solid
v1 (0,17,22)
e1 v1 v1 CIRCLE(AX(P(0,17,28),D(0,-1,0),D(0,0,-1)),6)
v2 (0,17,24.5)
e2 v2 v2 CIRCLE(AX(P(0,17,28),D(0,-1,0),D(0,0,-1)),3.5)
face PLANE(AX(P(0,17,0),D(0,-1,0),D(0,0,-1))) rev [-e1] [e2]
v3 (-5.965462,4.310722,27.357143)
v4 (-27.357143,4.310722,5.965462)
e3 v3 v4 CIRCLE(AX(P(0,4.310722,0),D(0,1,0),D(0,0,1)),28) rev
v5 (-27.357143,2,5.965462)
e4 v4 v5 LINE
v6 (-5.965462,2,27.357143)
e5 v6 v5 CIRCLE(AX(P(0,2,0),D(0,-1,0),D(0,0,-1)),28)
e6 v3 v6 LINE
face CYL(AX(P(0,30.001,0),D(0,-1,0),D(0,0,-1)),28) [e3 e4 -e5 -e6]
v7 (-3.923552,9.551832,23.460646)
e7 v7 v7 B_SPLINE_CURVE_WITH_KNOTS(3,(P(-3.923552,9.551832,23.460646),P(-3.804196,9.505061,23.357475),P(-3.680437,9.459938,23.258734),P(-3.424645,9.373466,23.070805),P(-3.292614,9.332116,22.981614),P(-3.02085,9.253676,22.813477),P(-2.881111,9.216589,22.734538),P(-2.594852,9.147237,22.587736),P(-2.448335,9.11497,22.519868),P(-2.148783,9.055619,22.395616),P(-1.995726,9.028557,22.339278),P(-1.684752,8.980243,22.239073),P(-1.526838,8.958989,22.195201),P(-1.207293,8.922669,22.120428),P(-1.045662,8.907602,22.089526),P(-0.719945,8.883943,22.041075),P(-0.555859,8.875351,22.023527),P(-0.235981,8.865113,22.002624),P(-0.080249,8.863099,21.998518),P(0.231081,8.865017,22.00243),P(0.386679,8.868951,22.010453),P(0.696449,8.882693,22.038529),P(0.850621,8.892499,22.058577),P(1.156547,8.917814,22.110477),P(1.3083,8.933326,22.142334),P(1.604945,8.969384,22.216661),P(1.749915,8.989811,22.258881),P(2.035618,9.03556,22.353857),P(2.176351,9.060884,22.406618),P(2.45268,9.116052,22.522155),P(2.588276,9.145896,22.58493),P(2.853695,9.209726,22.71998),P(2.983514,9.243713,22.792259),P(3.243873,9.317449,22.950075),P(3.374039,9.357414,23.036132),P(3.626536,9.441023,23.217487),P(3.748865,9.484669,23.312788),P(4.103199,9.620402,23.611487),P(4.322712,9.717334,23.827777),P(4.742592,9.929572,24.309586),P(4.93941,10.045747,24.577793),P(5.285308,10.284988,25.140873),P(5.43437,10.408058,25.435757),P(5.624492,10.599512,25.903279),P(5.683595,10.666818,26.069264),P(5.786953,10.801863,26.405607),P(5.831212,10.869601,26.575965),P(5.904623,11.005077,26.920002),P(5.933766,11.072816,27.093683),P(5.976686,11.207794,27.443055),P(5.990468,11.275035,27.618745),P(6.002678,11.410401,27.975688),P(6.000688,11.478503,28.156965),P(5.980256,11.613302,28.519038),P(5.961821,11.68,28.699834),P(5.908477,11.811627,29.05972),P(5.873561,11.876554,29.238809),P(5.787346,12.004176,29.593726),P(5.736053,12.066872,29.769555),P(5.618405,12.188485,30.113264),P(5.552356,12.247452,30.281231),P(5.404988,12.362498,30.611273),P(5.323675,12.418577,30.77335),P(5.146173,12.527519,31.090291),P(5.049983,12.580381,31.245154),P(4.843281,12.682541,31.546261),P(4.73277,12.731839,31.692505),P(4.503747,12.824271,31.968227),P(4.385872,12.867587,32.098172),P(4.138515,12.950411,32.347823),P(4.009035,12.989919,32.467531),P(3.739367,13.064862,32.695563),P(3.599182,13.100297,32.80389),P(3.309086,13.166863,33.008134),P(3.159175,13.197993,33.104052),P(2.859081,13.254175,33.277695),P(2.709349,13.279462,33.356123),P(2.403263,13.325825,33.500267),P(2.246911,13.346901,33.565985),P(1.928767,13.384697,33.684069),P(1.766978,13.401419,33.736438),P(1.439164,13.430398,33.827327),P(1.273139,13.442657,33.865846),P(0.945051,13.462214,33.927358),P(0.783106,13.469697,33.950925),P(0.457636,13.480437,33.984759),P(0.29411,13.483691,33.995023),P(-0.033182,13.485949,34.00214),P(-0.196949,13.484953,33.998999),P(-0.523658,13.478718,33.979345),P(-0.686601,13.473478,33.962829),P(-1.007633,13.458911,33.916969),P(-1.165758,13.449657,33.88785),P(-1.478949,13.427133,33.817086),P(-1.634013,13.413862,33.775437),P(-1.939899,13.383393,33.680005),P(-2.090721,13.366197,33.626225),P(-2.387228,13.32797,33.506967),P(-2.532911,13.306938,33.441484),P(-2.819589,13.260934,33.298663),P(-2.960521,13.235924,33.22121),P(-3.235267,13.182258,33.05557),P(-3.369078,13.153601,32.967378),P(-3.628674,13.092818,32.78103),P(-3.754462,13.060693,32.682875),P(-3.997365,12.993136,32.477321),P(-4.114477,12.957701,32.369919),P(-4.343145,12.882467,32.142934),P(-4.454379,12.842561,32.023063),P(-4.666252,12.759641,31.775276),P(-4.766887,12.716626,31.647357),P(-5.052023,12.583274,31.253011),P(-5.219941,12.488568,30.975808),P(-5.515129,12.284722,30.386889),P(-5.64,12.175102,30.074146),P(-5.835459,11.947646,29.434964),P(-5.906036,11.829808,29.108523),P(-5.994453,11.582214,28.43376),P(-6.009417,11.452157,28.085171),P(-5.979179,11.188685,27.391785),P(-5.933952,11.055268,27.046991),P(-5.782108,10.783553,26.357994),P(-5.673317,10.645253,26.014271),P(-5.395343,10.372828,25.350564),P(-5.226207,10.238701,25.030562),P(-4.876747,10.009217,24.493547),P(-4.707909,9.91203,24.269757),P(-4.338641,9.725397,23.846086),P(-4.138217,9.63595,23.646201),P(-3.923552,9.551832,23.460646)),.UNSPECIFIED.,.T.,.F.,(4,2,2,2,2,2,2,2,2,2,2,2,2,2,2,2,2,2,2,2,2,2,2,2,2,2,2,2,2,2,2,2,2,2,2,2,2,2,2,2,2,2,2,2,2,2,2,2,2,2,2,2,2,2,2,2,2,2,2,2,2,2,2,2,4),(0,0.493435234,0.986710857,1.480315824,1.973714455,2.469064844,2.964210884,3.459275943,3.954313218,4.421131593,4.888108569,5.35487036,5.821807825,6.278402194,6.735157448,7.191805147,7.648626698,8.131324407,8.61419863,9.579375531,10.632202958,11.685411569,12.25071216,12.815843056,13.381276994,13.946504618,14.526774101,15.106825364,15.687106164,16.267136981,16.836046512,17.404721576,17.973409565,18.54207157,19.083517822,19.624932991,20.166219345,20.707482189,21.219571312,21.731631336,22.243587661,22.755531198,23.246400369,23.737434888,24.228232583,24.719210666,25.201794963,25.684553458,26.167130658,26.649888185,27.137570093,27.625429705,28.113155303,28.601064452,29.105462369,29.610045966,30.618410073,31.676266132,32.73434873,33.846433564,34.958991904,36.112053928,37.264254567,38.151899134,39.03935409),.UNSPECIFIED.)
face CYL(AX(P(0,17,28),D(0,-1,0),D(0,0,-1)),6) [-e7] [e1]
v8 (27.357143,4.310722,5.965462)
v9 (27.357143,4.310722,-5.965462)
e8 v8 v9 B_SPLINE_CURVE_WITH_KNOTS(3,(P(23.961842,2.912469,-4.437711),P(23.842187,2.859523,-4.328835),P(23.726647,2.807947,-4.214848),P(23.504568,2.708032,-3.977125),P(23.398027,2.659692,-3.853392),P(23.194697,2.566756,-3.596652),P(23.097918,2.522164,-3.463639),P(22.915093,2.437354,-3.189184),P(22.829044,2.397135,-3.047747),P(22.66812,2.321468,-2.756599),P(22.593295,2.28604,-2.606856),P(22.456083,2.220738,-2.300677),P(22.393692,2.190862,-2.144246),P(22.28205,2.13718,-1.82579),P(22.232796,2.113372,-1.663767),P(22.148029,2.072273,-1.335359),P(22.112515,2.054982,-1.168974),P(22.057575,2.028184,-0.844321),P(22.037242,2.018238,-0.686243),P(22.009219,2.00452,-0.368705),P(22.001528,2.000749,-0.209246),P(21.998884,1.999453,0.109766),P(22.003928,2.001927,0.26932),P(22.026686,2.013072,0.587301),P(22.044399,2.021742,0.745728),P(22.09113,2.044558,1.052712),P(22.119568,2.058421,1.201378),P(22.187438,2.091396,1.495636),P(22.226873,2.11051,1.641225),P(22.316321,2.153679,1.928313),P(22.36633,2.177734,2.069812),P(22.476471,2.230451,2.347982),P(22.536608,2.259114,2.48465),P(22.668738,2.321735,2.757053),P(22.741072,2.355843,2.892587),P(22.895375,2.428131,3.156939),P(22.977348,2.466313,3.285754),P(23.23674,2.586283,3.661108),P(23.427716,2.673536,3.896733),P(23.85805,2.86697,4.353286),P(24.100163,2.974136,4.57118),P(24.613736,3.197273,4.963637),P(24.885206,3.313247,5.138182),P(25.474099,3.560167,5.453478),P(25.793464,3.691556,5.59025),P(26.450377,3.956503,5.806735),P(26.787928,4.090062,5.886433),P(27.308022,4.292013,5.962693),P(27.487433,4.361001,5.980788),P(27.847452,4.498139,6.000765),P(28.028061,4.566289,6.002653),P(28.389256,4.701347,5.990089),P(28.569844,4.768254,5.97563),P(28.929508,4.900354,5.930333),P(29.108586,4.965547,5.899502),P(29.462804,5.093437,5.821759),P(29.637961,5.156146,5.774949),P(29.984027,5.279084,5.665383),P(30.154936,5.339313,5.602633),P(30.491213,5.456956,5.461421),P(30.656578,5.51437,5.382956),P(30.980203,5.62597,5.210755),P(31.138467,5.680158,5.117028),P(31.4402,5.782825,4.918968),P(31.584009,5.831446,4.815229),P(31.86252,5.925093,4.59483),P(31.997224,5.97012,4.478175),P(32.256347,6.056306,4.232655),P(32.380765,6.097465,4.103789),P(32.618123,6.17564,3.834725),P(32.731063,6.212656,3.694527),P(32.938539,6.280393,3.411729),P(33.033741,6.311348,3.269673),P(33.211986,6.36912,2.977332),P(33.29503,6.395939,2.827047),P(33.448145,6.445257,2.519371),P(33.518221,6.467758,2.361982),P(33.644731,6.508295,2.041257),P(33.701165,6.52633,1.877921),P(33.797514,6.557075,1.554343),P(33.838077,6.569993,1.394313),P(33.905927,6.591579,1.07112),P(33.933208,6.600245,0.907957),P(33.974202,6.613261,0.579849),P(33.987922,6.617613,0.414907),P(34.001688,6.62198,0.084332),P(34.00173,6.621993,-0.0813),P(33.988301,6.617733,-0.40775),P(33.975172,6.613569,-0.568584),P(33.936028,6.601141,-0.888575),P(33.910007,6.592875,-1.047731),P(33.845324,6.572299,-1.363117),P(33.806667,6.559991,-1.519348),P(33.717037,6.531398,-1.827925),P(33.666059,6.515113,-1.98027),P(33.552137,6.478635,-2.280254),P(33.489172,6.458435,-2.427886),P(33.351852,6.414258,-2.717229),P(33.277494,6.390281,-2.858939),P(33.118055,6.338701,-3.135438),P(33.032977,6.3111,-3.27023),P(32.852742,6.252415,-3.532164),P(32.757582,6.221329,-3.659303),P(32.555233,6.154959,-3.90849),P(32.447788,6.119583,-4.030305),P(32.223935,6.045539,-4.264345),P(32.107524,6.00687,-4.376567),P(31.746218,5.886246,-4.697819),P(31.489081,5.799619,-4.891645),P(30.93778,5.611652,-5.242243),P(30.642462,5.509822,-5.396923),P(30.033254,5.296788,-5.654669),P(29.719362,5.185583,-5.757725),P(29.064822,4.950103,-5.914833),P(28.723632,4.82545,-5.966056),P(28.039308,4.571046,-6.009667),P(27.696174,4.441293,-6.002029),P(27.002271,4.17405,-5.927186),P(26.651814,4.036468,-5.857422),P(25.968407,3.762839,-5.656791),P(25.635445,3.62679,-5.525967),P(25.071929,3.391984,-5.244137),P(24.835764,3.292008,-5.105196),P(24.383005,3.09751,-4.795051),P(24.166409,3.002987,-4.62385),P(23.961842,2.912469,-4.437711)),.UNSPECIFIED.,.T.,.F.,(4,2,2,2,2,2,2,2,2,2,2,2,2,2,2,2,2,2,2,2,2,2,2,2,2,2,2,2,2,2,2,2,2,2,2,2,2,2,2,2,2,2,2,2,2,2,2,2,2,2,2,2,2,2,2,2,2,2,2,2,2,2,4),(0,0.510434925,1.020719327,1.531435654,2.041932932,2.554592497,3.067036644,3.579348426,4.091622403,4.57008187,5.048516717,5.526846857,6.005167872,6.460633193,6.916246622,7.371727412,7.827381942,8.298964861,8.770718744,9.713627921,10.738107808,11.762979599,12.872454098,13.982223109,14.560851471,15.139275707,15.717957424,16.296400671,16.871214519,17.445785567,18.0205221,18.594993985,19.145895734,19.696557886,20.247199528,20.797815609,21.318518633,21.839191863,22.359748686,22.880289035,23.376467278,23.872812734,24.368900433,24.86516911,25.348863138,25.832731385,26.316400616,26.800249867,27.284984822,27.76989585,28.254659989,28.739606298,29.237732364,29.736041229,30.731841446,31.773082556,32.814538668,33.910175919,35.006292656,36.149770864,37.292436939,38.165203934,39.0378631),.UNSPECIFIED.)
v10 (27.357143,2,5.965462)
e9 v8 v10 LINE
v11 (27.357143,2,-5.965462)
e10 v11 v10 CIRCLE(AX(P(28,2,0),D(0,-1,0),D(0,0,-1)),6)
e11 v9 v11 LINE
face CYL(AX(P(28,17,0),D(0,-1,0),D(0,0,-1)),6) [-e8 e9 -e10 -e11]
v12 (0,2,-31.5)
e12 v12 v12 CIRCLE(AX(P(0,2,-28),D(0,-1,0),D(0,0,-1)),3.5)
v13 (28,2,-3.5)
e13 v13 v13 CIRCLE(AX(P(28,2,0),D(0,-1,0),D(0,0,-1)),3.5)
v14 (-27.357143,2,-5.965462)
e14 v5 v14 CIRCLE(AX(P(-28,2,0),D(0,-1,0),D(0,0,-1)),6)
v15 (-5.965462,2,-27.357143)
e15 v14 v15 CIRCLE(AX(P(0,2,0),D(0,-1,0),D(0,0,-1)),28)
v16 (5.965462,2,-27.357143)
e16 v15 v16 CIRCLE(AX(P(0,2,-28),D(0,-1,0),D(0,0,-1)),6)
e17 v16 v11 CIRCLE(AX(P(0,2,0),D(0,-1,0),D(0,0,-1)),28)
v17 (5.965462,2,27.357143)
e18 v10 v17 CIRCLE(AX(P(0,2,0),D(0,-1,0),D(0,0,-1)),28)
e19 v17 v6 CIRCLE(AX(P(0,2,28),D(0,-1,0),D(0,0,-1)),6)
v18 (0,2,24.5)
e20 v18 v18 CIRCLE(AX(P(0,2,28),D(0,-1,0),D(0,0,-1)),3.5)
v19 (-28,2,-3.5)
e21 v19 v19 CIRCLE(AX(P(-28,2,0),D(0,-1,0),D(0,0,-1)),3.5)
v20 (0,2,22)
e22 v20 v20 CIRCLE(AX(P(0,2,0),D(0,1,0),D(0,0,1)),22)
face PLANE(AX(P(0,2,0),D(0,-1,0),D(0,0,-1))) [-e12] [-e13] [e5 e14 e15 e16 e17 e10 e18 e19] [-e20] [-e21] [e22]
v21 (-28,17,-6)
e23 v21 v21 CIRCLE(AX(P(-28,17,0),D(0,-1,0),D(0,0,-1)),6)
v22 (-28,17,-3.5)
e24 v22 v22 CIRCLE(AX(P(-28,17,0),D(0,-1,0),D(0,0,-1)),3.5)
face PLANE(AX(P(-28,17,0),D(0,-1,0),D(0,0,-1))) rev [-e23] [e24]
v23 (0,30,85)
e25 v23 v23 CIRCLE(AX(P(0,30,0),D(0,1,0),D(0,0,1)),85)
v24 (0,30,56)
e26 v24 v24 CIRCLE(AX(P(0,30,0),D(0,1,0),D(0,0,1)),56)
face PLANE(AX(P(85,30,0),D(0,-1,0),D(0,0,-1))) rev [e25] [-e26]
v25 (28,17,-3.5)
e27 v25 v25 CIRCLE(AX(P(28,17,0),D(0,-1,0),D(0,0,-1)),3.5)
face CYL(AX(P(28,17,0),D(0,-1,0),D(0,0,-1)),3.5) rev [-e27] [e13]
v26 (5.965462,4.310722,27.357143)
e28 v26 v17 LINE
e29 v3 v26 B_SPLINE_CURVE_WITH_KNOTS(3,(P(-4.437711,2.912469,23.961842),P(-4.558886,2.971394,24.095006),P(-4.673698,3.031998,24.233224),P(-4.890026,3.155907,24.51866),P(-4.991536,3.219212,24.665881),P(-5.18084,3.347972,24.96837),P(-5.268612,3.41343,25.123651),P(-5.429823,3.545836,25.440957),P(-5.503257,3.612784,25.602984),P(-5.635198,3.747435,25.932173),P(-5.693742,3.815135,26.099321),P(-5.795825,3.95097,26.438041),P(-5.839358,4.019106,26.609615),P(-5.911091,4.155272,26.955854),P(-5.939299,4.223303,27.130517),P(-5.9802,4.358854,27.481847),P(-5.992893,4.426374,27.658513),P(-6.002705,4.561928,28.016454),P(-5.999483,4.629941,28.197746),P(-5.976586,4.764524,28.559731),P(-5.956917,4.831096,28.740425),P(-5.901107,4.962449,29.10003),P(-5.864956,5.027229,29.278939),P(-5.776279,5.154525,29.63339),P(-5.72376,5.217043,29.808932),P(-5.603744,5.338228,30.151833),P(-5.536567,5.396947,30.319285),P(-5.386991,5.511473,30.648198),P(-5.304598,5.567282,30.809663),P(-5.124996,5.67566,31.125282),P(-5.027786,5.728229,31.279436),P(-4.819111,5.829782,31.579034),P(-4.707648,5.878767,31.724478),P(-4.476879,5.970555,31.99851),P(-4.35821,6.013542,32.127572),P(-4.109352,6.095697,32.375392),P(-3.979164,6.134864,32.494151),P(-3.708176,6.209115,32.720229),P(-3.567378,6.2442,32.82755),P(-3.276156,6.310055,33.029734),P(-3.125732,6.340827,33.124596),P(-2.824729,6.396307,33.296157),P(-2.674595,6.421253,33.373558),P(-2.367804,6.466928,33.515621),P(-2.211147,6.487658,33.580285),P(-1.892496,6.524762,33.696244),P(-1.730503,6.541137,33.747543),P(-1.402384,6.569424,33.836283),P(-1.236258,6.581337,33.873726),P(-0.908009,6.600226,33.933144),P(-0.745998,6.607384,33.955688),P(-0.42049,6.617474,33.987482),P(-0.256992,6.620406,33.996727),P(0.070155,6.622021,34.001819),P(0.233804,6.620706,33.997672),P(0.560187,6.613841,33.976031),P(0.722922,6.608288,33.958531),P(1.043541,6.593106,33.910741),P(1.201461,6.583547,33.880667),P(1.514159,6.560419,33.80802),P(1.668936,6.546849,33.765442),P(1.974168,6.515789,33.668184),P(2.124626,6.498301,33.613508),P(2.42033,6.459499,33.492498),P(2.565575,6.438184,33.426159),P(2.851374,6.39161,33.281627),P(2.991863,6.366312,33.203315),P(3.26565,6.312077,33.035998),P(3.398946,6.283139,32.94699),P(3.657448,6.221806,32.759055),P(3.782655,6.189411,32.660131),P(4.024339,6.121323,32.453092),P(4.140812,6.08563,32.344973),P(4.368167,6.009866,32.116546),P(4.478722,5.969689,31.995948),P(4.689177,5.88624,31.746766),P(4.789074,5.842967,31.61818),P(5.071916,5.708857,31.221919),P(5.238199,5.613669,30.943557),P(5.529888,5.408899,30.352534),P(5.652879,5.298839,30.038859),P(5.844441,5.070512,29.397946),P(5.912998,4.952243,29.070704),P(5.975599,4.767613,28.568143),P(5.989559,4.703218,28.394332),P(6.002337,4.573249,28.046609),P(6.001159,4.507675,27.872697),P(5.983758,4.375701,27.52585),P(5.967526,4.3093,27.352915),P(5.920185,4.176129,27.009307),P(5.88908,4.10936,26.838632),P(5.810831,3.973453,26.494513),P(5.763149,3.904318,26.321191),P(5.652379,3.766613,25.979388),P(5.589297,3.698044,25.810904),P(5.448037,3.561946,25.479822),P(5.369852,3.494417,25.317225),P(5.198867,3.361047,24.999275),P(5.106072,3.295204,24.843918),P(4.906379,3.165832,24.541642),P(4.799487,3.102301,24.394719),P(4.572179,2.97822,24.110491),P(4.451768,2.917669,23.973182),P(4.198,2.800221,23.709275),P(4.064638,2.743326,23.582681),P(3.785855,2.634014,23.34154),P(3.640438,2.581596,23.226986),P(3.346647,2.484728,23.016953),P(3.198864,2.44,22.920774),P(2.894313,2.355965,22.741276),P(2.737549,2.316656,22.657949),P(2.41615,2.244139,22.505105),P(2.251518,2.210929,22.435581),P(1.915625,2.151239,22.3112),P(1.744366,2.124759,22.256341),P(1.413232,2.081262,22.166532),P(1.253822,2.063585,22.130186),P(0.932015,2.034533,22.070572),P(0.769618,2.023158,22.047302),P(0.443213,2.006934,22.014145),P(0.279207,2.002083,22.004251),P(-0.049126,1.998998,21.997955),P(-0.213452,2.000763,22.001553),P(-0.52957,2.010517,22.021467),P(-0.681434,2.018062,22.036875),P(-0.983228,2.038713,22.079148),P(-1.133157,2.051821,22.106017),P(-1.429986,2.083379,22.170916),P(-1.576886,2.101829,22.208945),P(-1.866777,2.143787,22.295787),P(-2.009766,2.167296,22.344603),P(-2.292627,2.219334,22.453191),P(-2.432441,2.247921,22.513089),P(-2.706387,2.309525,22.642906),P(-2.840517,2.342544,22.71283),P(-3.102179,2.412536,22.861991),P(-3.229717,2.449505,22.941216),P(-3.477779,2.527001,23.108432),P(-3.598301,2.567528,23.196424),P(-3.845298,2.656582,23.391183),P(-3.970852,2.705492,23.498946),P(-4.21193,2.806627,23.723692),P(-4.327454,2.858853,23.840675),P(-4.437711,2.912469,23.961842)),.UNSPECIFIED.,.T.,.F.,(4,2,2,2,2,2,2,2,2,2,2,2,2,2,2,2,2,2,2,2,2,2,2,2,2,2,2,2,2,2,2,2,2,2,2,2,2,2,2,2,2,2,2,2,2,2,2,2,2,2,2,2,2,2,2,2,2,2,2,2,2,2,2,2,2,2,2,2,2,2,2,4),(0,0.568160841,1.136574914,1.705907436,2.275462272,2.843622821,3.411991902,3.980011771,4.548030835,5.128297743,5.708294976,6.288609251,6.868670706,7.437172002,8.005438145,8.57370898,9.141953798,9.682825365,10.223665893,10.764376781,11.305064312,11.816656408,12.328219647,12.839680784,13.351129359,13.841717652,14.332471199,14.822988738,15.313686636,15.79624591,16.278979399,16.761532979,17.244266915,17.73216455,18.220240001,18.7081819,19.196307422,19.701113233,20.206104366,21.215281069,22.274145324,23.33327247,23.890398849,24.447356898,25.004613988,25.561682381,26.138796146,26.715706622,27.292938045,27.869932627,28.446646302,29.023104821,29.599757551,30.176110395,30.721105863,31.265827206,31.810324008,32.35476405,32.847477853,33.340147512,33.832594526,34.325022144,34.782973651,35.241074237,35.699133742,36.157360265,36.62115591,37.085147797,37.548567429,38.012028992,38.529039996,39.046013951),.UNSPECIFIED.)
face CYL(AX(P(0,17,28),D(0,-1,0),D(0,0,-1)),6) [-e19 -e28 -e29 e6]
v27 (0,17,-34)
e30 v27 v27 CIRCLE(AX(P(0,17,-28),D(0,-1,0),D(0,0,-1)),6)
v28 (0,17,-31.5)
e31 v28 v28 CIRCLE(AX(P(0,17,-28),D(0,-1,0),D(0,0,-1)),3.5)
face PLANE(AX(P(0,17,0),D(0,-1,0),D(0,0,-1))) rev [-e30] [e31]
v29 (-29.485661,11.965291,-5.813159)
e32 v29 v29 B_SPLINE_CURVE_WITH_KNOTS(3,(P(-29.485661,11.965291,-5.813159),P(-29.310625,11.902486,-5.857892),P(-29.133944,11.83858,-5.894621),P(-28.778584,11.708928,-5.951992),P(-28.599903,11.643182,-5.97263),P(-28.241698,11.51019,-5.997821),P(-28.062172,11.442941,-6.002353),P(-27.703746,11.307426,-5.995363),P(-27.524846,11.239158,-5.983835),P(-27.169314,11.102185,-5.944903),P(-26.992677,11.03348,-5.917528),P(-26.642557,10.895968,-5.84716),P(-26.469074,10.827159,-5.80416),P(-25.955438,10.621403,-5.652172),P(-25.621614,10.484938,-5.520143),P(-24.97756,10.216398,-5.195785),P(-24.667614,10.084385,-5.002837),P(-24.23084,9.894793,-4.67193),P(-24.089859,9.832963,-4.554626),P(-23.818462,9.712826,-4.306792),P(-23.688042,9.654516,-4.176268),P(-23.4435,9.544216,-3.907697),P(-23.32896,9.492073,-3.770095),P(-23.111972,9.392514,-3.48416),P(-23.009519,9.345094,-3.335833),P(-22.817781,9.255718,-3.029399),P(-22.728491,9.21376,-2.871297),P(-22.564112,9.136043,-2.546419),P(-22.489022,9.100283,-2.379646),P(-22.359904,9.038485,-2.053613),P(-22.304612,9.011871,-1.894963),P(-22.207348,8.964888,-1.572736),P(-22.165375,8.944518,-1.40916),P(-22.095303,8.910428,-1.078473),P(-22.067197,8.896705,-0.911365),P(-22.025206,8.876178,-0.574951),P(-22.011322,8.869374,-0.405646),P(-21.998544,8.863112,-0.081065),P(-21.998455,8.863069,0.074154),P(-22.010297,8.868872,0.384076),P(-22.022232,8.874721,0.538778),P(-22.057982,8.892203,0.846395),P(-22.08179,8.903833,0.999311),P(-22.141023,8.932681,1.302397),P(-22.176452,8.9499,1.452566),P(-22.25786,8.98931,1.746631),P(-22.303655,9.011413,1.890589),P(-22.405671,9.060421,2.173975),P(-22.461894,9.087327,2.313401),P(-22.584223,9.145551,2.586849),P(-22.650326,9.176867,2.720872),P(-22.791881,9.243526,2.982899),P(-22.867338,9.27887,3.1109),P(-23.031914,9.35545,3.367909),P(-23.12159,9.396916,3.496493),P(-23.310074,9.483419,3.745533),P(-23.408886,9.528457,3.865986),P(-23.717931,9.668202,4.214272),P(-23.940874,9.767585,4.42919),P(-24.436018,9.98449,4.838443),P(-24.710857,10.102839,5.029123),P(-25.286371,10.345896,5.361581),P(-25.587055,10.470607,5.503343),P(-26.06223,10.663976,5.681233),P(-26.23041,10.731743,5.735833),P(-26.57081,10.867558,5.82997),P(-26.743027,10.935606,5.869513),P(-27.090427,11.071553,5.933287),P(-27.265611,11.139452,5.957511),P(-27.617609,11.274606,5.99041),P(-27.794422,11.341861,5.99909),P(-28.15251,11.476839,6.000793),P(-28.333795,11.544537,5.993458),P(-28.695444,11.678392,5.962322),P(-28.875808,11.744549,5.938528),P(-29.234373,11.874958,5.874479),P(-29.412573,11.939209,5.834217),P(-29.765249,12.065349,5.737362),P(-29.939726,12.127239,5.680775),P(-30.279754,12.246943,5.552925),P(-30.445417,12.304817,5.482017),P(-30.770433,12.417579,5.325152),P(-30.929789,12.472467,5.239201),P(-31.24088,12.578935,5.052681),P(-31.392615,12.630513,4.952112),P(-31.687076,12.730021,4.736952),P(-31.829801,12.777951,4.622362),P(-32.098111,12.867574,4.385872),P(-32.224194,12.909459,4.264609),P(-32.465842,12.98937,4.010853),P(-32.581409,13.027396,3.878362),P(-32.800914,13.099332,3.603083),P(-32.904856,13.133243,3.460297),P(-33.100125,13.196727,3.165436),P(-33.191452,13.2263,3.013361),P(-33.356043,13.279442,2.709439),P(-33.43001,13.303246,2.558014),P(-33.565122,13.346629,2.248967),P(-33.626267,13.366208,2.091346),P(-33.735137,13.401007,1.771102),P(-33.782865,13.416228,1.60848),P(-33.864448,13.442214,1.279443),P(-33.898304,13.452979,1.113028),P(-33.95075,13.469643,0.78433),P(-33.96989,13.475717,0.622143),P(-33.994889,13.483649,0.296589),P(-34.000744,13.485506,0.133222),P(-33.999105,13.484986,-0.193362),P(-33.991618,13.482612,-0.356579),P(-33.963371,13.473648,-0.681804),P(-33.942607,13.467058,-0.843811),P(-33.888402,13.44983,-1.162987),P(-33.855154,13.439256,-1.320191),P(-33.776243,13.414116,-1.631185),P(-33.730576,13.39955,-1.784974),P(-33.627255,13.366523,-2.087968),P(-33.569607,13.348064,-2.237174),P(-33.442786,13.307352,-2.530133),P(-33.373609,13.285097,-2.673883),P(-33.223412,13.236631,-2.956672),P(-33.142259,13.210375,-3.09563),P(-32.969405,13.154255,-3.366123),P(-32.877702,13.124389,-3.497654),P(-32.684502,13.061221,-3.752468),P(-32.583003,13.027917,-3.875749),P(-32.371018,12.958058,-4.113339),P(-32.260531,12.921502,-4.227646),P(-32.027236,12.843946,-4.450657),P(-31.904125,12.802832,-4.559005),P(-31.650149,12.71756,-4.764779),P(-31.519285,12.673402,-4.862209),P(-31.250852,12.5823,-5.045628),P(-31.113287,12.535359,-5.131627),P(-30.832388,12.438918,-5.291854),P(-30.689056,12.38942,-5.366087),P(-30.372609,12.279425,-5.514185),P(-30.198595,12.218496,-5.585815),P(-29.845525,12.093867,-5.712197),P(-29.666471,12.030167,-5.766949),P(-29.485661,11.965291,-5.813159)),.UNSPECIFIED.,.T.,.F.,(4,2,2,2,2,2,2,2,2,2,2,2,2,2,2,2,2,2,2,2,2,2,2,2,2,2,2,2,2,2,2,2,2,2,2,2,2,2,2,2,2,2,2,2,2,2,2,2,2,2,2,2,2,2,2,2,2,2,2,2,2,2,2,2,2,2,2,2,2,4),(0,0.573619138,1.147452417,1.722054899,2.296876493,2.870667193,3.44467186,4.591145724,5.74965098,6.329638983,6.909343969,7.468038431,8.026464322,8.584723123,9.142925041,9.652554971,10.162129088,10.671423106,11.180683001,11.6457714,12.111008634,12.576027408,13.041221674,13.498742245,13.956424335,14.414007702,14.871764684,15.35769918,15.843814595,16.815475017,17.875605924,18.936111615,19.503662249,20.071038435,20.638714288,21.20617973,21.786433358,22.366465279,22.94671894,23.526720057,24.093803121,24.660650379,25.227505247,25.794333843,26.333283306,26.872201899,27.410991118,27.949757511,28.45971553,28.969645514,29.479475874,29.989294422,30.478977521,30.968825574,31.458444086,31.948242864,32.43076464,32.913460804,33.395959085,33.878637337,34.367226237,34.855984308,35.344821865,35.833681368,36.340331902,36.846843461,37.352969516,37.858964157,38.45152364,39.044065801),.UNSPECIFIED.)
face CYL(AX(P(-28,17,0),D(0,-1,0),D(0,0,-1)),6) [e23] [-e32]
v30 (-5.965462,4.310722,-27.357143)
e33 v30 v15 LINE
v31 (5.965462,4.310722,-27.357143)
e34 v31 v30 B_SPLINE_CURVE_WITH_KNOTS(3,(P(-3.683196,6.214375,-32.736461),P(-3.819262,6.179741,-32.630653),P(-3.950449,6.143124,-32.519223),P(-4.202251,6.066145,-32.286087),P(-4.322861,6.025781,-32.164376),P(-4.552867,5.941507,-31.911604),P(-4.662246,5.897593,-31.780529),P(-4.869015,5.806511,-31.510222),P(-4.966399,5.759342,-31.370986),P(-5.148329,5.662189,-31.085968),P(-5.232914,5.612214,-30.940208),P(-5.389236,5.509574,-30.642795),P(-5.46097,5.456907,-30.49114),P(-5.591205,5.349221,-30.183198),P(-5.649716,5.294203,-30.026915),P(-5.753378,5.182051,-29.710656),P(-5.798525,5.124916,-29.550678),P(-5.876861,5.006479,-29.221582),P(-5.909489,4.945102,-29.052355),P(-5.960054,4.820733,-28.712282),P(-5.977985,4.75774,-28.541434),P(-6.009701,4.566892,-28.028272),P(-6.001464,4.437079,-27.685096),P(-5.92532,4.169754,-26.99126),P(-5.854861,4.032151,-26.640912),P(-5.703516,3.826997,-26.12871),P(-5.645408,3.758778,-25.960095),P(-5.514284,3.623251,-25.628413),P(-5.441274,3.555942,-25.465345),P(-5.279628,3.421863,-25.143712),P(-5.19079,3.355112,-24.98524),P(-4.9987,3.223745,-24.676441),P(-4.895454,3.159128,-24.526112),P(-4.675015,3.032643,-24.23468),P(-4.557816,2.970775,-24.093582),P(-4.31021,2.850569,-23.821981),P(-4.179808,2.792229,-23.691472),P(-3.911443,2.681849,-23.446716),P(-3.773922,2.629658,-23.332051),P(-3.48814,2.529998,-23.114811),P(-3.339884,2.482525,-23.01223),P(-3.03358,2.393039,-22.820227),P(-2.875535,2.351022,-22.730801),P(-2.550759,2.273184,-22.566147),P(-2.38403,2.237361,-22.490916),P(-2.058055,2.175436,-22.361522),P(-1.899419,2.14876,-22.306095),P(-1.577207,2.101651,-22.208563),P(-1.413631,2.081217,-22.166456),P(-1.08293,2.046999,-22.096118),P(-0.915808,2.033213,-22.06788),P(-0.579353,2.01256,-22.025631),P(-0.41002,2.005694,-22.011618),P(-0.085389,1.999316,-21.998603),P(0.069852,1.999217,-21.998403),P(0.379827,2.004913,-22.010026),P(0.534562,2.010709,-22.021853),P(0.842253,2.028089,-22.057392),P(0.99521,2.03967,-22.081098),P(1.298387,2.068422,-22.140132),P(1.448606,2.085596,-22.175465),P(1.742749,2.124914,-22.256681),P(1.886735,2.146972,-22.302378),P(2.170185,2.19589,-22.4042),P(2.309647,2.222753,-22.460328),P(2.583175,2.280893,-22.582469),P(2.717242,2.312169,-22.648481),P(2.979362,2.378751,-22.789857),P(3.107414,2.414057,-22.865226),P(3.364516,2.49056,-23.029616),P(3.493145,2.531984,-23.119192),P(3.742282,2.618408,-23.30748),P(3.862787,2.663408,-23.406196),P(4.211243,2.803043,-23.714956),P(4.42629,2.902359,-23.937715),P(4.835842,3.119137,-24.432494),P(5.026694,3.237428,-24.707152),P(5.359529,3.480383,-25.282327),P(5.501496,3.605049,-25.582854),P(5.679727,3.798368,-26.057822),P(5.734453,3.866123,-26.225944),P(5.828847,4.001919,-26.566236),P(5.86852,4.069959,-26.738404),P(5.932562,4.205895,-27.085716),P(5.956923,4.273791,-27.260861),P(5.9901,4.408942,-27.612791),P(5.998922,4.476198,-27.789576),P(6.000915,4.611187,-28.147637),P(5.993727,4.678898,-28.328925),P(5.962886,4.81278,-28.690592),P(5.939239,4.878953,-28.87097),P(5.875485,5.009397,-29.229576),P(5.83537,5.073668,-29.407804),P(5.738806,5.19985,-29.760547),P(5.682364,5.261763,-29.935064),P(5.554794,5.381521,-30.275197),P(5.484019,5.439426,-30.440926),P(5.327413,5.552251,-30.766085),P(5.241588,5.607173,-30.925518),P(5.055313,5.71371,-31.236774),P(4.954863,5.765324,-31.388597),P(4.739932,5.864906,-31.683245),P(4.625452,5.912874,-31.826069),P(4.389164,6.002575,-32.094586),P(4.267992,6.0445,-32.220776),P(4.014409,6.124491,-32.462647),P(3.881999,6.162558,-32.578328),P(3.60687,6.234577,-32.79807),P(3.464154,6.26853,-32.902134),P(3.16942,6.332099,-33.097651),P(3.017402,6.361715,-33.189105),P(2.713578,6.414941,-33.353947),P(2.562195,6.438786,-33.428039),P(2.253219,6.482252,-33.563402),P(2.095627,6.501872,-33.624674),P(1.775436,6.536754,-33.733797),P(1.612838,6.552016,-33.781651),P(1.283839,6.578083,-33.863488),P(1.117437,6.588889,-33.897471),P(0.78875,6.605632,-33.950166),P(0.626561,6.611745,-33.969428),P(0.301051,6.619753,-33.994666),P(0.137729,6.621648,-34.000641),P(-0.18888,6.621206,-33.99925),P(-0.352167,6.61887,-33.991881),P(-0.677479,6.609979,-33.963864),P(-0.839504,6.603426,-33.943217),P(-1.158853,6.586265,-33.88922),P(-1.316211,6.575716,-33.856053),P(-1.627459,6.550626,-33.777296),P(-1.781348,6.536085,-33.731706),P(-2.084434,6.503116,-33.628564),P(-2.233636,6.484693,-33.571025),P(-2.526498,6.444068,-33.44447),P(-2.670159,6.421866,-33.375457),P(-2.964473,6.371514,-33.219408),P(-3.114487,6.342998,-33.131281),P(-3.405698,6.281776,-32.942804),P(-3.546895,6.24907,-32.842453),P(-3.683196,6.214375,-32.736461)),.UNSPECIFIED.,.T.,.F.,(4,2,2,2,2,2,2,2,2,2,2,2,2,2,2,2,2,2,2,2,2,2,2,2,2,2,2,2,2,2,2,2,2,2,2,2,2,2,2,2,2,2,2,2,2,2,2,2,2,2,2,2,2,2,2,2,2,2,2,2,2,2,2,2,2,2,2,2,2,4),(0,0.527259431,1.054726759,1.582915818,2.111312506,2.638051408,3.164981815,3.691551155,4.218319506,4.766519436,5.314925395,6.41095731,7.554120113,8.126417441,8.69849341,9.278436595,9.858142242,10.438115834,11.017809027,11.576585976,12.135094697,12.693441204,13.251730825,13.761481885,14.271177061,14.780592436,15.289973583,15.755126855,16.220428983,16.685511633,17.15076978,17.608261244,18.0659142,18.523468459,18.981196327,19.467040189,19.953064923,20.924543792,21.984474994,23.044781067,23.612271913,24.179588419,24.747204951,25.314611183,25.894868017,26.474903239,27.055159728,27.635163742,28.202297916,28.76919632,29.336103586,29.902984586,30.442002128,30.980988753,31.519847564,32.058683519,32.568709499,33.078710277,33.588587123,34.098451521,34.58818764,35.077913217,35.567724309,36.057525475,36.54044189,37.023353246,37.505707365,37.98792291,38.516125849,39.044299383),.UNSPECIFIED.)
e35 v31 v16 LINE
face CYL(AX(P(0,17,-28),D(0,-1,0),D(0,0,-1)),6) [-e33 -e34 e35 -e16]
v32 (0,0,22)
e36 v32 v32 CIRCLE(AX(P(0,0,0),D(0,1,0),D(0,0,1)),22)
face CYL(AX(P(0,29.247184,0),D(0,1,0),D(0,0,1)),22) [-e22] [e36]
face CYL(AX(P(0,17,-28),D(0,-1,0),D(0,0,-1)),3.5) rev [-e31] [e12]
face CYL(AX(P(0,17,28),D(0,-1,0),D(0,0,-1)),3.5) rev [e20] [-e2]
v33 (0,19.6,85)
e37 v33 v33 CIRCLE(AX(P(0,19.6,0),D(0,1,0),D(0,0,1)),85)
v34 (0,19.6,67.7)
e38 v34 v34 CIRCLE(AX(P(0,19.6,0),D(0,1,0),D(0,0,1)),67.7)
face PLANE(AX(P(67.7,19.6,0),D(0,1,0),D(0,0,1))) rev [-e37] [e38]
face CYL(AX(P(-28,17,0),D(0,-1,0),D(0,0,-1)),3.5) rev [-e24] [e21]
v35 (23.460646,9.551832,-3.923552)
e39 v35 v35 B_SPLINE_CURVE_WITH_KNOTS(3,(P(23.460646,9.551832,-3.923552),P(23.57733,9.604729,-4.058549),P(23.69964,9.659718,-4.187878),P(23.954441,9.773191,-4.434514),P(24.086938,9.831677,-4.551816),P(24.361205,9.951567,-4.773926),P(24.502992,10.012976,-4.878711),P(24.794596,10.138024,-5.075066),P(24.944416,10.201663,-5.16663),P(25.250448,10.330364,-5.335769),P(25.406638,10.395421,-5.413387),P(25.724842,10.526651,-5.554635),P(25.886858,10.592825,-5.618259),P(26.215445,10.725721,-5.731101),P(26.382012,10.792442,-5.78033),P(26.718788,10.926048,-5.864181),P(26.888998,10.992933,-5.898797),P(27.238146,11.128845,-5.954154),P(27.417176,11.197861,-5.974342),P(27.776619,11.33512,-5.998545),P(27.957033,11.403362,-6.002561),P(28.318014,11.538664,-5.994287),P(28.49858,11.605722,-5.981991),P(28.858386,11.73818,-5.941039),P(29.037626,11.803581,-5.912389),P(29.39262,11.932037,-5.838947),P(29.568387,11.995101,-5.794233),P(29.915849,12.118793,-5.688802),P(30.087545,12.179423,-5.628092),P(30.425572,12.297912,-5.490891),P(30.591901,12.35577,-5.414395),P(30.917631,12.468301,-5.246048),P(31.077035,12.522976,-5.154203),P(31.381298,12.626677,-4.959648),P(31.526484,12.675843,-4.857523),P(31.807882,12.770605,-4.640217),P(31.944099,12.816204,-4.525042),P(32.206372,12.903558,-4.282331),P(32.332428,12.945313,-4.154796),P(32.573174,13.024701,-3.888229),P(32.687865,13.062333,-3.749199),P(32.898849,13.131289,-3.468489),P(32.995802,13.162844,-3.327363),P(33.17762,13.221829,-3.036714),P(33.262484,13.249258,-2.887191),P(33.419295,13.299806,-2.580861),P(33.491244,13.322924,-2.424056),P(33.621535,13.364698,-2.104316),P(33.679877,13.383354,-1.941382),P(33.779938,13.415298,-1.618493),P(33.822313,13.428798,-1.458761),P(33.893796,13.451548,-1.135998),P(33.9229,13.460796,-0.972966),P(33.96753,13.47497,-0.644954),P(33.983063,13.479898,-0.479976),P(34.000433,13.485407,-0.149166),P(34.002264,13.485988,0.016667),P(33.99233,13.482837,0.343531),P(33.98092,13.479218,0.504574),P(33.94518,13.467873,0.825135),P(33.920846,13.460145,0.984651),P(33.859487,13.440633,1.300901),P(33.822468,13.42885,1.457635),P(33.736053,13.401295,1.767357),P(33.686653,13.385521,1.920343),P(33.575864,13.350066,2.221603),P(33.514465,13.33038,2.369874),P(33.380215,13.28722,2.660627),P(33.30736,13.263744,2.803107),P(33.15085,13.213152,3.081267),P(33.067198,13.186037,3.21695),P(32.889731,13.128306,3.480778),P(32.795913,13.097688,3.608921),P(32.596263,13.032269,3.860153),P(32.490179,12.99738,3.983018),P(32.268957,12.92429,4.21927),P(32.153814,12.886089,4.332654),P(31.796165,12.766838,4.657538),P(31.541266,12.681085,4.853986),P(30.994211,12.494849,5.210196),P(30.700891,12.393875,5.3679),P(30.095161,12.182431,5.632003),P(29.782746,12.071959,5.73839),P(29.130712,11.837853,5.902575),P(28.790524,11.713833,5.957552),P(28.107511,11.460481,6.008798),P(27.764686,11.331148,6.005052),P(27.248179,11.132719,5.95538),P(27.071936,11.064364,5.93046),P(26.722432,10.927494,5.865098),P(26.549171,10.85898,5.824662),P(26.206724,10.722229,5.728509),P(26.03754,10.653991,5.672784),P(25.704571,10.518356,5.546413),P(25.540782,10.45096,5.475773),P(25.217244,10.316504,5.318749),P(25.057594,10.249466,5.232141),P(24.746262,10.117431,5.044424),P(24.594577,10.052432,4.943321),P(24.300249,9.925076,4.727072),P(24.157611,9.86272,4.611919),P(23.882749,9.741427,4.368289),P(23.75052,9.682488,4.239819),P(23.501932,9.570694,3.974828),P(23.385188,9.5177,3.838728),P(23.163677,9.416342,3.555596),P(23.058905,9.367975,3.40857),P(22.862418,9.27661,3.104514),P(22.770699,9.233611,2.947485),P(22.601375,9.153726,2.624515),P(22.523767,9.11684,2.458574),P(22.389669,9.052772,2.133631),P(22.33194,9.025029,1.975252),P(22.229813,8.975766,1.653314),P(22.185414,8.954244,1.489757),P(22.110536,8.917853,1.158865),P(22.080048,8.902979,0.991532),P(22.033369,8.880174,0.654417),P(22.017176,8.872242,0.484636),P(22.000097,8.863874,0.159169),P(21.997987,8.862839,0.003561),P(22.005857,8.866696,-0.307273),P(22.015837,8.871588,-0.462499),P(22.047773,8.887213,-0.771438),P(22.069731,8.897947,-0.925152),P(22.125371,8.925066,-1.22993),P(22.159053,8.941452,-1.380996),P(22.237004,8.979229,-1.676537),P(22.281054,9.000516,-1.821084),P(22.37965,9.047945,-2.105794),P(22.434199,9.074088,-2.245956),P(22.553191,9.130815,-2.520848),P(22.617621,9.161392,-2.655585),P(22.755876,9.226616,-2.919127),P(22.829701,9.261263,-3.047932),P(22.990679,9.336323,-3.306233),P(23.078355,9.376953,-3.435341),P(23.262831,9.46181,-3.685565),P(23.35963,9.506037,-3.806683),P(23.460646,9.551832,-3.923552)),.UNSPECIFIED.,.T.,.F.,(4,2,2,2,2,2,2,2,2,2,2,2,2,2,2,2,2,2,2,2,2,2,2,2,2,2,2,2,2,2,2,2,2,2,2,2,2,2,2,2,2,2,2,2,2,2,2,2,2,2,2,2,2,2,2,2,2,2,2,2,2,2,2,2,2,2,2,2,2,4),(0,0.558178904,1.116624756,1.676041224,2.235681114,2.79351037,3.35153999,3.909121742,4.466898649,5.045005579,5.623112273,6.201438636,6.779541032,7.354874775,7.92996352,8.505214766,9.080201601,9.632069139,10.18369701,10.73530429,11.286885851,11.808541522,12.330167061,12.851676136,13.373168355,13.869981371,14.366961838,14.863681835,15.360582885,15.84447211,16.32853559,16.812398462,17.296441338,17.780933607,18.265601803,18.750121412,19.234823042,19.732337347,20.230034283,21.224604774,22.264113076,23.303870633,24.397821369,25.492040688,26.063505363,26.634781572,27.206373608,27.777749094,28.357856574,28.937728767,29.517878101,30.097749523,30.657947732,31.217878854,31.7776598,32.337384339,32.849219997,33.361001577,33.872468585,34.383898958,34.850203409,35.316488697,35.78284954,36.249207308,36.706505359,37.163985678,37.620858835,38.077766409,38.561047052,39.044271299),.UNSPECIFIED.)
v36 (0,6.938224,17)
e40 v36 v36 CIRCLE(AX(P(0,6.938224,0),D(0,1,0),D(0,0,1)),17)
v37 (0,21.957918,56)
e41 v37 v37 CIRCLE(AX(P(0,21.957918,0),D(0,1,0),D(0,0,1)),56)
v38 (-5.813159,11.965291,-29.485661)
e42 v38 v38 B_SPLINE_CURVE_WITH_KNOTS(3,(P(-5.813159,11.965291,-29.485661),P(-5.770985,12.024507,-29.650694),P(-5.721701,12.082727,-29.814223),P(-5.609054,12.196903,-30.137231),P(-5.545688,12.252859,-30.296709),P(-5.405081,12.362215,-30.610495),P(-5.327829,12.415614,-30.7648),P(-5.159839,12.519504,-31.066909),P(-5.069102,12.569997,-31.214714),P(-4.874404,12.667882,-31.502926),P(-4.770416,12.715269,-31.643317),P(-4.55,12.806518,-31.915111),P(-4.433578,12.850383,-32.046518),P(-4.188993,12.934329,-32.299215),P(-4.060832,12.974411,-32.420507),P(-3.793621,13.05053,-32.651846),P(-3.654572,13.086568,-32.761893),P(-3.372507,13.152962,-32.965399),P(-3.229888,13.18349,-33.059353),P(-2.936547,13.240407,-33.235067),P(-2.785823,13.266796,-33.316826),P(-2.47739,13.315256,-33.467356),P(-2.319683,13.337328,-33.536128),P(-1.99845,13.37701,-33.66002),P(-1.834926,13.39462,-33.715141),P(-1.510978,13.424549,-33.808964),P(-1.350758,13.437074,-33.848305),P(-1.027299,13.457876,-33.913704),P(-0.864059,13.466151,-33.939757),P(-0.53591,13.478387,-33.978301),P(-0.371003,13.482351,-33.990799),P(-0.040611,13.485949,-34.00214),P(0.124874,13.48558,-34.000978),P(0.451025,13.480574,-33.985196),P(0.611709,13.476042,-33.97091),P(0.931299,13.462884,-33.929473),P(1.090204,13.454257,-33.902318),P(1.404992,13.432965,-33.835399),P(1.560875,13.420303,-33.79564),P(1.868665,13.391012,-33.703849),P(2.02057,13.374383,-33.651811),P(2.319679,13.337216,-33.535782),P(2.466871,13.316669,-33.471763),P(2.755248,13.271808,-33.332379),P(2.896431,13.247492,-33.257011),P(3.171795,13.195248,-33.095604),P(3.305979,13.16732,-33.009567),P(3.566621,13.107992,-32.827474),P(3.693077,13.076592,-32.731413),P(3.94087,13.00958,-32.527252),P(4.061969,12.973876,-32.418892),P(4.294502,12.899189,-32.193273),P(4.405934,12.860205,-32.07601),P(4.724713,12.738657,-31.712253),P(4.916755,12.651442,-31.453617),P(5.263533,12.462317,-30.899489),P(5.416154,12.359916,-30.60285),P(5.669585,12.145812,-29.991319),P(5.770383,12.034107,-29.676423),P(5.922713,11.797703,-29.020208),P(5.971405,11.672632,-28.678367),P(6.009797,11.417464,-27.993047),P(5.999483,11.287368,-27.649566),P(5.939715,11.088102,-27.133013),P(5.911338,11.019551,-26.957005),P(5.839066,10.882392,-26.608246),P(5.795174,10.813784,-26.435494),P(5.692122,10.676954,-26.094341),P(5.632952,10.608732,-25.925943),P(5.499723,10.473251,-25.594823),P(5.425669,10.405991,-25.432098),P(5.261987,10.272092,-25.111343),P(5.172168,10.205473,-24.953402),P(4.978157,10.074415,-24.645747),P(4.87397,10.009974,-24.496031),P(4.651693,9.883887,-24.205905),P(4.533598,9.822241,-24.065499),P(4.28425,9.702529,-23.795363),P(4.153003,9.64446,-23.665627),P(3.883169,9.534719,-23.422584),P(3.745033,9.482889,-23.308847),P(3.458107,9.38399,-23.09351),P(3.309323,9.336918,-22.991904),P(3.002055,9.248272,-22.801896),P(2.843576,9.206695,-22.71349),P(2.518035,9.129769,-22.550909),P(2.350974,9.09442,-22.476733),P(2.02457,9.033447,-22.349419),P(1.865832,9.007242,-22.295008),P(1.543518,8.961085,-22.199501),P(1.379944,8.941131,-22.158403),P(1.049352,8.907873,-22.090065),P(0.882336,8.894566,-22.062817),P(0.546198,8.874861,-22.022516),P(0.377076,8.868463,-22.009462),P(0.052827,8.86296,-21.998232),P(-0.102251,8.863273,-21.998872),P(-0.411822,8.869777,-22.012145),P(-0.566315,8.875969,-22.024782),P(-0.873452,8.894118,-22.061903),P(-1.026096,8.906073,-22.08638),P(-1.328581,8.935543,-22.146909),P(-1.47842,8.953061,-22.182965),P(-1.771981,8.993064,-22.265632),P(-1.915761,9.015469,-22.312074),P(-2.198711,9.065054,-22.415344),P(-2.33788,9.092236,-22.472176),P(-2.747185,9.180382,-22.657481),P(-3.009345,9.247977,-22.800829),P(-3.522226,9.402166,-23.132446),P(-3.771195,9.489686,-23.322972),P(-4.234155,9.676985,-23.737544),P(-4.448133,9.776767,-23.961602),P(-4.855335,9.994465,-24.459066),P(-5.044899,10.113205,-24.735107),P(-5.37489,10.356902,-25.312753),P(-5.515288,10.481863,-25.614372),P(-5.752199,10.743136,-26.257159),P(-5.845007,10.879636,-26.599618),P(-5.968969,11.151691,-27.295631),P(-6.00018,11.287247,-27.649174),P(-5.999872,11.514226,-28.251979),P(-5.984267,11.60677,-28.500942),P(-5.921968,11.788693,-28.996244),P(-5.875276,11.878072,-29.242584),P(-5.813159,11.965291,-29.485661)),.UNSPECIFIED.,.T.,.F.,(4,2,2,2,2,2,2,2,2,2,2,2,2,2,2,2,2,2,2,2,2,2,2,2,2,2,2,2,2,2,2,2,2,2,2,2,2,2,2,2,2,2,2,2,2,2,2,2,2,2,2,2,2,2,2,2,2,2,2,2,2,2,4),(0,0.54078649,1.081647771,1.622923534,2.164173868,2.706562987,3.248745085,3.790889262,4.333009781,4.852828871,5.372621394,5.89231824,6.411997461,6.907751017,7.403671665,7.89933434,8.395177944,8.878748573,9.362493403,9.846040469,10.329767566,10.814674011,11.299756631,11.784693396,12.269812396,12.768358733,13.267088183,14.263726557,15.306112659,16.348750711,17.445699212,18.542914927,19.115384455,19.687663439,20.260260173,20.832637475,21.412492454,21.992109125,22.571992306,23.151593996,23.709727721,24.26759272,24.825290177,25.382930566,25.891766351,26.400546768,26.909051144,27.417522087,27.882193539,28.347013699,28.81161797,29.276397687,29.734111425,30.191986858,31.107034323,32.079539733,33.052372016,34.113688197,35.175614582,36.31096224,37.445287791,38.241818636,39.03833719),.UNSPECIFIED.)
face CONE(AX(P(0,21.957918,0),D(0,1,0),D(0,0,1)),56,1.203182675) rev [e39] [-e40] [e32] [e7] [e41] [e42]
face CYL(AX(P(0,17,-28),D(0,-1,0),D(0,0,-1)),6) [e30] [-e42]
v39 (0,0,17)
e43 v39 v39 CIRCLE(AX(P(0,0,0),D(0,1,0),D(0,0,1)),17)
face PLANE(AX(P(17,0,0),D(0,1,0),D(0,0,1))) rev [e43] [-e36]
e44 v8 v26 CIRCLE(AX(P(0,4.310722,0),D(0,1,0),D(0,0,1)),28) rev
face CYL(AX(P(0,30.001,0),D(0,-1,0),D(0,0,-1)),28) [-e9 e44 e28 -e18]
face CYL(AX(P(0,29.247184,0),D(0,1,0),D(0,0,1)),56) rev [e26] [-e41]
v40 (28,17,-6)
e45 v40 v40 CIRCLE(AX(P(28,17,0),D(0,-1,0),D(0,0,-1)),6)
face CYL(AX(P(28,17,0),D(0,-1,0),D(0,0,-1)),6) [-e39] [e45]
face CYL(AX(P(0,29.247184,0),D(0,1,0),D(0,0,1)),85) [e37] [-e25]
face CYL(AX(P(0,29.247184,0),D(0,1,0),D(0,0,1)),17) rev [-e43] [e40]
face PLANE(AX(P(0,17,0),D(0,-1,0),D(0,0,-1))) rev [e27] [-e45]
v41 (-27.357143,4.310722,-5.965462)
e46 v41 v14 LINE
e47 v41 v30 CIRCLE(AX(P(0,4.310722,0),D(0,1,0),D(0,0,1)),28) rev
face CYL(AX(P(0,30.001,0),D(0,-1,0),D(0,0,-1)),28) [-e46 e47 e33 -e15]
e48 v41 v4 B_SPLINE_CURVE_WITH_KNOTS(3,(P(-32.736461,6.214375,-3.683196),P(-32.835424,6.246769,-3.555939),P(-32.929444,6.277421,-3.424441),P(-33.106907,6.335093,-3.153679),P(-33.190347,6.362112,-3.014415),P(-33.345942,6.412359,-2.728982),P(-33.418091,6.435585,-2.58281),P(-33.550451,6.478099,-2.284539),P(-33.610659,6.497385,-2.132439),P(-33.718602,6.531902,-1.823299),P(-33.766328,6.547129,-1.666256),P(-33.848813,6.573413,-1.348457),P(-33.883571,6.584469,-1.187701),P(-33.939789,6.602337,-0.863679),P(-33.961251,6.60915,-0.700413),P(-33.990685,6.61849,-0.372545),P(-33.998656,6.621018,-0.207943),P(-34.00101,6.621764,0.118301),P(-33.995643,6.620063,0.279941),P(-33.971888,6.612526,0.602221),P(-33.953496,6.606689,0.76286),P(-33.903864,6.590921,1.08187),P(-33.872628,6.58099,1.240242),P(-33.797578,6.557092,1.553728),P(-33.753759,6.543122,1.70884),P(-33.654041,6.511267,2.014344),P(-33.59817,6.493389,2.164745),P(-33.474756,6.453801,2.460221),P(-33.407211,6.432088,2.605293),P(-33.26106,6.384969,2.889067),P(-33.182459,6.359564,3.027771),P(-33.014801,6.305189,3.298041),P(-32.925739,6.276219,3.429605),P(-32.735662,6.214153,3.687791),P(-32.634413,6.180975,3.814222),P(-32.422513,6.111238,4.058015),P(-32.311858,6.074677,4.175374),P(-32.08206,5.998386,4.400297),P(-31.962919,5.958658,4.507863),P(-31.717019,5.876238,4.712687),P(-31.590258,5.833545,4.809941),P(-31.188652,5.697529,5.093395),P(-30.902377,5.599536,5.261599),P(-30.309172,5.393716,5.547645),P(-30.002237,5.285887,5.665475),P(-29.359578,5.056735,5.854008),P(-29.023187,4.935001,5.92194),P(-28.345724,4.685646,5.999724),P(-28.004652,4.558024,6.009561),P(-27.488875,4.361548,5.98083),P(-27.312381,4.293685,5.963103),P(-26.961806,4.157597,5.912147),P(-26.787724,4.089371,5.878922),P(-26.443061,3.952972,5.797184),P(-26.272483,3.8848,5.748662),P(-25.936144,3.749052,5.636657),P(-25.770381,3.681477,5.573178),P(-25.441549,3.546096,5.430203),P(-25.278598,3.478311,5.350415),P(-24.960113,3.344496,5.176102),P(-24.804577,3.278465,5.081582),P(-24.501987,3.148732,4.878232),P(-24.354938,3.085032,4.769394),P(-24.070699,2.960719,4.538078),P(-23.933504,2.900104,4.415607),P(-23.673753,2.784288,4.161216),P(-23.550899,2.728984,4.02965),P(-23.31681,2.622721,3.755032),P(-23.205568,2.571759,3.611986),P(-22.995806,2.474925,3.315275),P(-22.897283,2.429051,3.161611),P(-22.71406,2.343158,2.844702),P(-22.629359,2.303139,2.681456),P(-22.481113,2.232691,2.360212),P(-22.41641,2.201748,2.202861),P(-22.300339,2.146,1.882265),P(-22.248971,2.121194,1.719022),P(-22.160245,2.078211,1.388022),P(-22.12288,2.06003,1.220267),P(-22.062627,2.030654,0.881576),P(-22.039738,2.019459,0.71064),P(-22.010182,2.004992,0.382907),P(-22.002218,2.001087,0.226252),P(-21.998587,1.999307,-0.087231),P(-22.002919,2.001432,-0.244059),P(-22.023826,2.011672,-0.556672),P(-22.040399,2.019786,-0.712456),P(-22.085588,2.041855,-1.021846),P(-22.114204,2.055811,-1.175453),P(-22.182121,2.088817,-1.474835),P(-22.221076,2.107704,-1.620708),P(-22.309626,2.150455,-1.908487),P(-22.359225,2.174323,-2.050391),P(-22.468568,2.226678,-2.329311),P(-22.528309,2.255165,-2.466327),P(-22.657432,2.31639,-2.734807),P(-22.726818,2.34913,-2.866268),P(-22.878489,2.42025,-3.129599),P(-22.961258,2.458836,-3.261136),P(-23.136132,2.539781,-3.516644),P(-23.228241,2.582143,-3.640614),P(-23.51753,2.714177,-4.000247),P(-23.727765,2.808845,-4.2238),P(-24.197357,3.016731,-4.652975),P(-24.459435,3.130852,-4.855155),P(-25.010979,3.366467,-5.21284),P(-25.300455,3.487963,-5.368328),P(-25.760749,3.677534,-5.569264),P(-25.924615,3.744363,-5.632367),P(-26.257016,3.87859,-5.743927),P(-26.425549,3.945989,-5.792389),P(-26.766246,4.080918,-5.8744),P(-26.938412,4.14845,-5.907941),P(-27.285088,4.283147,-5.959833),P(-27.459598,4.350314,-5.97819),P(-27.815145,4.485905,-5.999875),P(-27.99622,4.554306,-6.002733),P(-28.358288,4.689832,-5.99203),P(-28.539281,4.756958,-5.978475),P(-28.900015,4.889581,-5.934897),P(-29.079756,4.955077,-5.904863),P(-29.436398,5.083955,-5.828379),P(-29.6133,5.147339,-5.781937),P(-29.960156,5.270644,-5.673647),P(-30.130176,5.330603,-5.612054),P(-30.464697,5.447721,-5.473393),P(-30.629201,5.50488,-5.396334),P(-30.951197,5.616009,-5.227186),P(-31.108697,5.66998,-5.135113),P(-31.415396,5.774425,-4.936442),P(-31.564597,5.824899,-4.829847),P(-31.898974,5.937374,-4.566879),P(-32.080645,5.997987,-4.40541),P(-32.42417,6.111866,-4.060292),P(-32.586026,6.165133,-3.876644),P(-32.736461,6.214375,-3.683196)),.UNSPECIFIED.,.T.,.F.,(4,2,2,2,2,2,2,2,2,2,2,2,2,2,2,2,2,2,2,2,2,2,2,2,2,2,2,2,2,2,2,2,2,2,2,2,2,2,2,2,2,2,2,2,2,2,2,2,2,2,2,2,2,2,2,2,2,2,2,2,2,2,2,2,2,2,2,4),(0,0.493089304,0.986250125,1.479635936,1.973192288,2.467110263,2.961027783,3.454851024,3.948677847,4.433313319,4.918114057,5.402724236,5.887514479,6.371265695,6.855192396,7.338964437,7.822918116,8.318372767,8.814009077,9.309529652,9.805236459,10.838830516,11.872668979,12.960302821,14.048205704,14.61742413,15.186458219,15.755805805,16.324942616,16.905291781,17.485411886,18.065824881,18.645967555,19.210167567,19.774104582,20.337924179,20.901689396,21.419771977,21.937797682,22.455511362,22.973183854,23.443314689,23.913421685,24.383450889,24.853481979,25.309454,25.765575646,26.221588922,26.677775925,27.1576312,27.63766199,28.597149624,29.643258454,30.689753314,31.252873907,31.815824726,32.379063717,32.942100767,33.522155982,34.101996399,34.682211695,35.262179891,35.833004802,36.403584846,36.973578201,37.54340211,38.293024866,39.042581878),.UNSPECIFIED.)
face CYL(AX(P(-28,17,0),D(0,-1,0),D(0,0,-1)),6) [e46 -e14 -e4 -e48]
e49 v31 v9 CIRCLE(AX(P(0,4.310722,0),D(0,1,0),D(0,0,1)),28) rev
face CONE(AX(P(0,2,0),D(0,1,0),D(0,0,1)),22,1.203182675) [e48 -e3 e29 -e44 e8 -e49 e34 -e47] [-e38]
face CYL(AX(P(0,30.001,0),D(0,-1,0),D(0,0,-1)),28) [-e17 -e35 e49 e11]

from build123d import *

# Parameters (mm, degrees)
SKETCH2_R           = 6
SKETCH2_R_2         = 3.5
BOSS_EXTRUDE1_DEPTH = 15
BOSS_EXTRUDE2_REACH = 125.426
SKETCH3_R           = 6
SKETCH4_R           = 3.5
CUT_EXTRUDE1_DEPTH  = 124.426091245


with BuildPart() as part:
    # Sketch1 → Revolve1 (revolve)
    with BuildSketch(Plane.XY):
        Polygon((17, 0), (22, 0), (22, 2), (67.7, 19.6), (85, 19.6), (85, 30), (56, 30), (56, 21.957917656), (17, 6.938224002), align=None)
    revolve(axis=Axis((0, 29.247184332, 0), (0, -1, 0)))

    # Sketch2 → Boss-Extrude1 (add)
    # profile 1 of 4: a face of its own
    with BuildSketch(Plane(origin=(0, 2, 0), x_dir=(-1, 0, 0), z_dir=(0, -1, 0))):
        with Locations((0, 28)):
            Circle(SKETCH2_R)
        with Locations((0, 28)):
            Circle(SKETCH2_R_2, mode=Mode.SUBTRACT)
    # profile 2 of 4: a face of its own
    with BuildSketch(Plane(origin=(0, 2, 0), x_dir=(-1, 0, 0), z_dir=(0, -1, 0))):
        with Locations((28, 0)):
            Circle(SKETCH2_R)
        with Locations((28, 0)):
            Circle(SKETCH2_R_2, mode=Mode.SUBTRACT)
    # profile 3 of 4: a face of its own
    with BuildSketch(Plane(origin=(0, 2, 0), x_dir=(-1, 0, 0), z_dir=(0, -1, 0))):
        with Locations((0, -28)):
            Circle(SKETCH2_R)
        with Locations((0, -28)):
            Circle(SKETCH2_R_2, mode=Mode.SUBTRACT)
    # profile 4 of 4: a face of its own
    with BuildSketch(Plane(origin=(0, 2, 0), x_dir=(-1, 0, 0), z_dir=(0, -1, 0))):
        with Locations((-28, 0)):
            Circle(SKETCH2_R)
        with Locations((-28, 0)):
            Circle(SKETCH2_R_2, mode=Mode.SUBTRACT)
    extrude(amount=-BOSS_EXTRUDE1_DEPTH)

    # Boss-Extrude2: up to this cone (the profile starts outside it)
    boss_extrude2_end = Plane(origin=(0, 2, 0), z_dir=(0, 1, 0)).offset(-8.472646702) * Cone(2.597e-06, 406.103306818, 156.398646702, align=(Align.CENTER, Align.CENTER, Align.MIN), mode=Mode.PRIVATE)
    # Sketch3 → Boss-Extrude2 (add, up to the surface)
    with BuildSketch(Plane(origin=(0, 2, 0), x_dir=(-1, 0, 0), z_dir=(0, -1, 0)), mode=Mode.PRIVATE) as boss_extrude2_sk1:
        with BuildLine():
            ThreePointArc((-22, 0), (-23.535857145, -4.008918629), (-27.357142857, -5.965461817))
            ThreePointArc((-27.357142857, -5.965461817), (-19.798989873, -19.798989873), (-5.965461817, -27.357142857))
            ThreePointArc((-5.965461817, -27.357142857), (0, -22), (5.965461817, -27.357142857))
            ThreePointArc((5.965461817, -27.357142857), (19.798989873, -19.798989873), (27.357142857, -5.965461817))
            ThreePointArc((27.357142857, -5.965461817), (22, 0), (27.357142857, 5.965461817))
            ThreePointArc((27.357142857, 5.965461817), (19.798989873, 19.798989873), (5.965461817, 27.357142857))
            ThreePointArc((5.965461817, 27.357142857), (0, 22), (-5.965461817, 27.357142857))
            ThreePointArc((-5.965461817, 27.357142857), (-19.798989873, 19.798989873), (-27.357142857, 5.965461817))
            ThreePointArc((-27.357142857, 5.965461817), (-23.535857145, 4.008918629), (-22, 0))
        make_face()
        Circle(SKETCH3_R, mode=Mode.SUBTRACT)
    boss_extrude2_tool1 = extrude(boss_extrude2_sk1.sketch, amount=-BOSS_EXTRUDE2_REACH, mode=Mode.PRIVATE) - boss_extrude2_end
    add(boss_extrude2_tool1.solids().sort_by_distance((22.960149, 2, -4.52592))[0])
    add(boss_extrude2_tool1.solids().sort_by_distance((22.960149, 2, -4.52592))[1])
    add(boss_extrude2_tool1.solids().sort_by_distance((22.960149, 2, -4.52592))[2])
    add(boss_extrude2_tool1.solids().sort_by_distance((22.960149, 2, -4.52592))[3])

    # Sketch4 → Cut-Extrude1 (cut, through all)
    with BuildSketch(Plane(origin=(0, 2, 0), x_dir=(-1, 0, 0), z_dir=(0, -1, 0))):
        with Locations((0, 28)):
            Circle(SKETCH4_R)
        with Locations((28, 0)):
            Circle(SKETCH4_R)
        with Locations((0, -28)):
            Circle(SKETCH4_R)
        with Locations((-28, 0)):
            Circle(SKETCH4_R)
    extrude(amount=-CUT_EXTRUDE1_DEPTH, mode=Mode.SUBTRACT)


solid = part.part
